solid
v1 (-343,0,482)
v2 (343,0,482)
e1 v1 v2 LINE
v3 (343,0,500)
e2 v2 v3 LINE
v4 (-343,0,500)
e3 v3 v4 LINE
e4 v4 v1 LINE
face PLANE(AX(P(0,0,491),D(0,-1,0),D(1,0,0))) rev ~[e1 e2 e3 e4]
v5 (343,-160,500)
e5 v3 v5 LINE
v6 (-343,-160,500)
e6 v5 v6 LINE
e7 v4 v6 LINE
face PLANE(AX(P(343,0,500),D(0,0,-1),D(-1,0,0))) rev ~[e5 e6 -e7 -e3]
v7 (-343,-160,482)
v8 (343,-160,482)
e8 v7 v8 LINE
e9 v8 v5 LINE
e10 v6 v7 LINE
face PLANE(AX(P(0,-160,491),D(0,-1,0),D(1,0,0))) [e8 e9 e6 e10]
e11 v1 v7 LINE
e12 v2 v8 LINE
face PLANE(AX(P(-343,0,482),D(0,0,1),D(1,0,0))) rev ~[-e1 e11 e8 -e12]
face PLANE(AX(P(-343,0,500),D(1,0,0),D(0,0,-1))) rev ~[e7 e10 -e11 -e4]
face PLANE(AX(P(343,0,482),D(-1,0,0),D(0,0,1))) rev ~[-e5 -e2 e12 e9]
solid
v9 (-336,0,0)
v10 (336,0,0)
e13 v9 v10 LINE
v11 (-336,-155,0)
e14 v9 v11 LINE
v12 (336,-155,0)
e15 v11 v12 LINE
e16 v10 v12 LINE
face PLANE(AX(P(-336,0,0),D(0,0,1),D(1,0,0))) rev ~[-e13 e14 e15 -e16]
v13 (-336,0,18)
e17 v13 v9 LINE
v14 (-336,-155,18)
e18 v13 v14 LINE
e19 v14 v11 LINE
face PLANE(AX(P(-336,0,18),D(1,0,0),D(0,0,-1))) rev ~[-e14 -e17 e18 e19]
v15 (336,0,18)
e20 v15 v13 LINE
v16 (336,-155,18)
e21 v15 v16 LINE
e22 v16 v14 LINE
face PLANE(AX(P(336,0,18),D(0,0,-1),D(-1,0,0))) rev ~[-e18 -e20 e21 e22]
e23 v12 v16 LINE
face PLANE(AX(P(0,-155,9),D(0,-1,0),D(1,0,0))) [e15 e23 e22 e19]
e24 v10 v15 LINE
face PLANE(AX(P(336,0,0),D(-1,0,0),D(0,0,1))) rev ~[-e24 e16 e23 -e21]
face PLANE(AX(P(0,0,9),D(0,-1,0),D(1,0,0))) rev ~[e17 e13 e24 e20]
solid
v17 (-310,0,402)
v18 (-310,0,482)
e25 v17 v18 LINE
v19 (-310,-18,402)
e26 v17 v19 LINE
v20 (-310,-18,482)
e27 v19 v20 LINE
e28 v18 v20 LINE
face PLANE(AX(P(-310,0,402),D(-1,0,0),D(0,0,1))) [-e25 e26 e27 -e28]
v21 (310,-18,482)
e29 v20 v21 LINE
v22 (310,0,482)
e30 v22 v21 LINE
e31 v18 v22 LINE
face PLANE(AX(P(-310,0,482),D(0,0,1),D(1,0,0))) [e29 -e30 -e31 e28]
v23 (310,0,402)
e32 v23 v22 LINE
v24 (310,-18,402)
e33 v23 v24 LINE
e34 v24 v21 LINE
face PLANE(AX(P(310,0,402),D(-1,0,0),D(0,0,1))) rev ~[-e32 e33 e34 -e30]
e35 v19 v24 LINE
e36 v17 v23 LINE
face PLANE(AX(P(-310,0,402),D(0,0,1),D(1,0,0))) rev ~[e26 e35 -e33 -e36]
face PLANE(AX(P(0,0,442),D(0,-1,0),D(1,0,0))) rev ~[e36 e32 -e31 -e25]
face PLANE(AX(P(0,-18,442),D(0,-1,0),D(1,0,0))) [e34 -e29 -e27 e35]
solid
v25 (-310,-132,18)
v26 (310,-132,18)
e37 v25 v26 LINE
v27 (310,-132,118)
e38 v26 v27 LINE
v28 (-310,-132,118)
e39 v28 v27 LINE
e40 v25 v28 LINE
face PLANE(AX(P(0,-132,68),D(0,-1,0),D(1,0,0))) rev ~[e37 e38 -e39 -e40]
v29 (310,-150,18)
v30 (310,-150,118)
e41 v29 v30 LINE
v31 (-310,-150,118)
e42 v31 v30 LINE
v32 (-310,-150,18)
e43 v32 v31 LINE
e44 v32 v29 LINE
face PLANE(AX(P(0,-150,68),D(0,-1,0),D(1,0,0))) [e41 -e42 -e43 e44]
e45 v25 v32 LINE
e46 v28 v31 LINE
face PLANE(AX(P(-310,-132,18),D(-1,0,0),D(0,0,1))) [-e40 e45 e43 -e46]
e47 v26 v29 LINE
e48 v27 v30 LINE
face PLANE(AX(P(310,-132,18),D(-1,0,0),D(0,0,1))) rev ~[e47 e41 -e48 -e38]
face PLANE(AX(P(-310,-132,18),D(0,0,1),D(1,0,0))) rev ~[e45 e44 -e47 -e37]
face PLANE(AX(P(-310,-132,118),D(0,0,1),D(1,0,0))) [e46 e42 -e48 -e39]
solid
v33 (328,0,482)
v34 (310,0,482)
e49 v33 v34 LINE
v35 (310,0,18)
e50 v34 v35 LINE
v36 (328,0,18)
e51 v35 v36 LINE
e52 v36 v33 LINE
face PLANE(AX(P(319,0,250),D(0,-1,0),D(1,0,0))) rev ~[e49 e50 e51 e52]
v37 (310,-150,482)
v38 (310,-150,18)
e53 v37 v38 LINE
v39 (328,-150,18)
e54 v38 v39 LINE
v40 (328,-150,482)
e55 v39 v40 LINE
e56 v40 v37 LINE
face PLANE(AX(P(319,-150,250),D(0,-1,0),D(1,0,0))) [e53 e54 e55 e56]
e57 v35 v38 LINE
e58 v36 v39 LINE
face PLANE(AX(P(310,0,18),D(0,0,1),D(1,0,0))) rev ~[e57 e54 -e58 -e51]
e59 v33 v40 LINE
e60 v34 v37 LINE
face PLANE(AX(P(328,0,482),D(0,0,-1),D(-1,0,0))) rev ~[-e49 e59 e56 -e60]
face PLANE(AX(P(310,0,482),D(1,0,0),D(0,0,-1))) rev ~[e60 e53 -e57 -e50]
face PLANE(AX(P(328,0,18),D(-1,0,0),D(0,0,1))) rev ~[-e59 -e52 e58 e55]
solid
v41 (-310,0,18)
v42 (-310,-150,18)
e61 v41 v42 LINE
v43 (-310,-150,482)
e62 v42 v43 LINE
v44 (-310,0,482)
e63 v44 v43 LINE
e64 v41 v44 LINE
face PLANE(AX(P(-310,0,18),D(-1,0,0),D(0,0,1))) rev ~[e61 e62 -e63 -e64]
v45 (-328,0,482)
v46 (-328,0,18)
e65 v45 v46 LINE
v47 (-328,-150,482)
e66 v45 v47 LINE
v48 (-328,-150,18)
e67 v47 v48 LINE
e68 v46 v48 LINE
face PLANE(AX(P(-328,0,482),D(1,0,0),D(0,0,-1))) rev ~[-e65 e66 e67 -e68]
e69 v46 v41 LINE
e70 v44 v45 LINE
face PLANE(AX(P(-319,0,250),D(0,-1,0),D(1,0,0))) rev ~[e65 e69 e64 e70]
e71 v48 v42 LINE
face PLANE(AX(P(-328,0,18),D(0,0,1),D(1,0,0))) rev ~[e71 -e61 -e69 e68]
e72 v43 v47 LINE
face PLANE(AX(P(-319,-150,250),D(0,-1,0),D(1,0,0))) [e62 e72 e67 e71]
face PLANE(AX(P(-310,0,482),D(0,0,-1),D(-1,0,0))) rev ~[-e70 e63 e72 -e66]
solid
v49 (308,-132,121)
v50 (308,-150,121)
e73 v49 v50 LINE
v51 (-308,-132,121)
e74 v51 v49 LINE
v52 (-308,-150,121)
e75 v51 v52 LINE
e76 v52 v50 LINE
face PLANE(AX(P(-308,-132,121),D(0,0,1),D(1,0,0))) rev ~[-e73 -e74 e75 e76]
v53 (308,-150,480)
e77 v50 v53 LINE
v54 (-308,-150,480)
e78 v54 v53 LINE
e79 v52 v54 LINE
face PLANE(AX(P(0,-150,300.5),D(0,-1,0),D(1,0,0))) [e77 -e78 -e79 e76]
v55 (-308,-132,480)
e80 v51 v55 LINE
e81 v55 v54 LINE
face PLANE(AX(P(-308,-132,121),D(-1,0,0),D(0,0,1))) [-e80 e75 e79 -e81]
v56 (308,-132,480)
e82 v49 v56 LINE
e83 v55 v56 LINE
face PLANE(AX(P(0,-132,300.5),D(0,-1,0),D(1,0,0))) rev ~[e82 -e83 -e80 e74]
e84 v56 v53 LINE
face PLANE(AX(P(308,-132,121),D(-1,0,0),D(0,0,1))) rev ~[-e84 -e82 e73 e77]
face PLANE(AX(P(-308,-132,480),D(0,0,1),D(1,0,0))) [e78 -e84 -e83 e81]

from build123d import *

# Parameters (mm, degrees)
F2_DEPTH = 150
F3_DEPTH = 155
F4_START = 132
F1_W     = 620
F1_H     = 100
F4_DEPTH = 18
F5_DEPTH = 160
F6_START = 132
F1_W_2   = 616
F1_H_2   = 359
F6_DEPTH = 18
F7_W     = 620
F7_H     = 80
F8_DEPTH = 18


# Not quite as in the source:
# - a feature of the source that left no trace in its solid (it failed there, or was rolled back) is left out


with BuildPart() as f2:
    # F1 (on Front) → F2 (new body)
    with BuildSketch(Plane.XZ):
        Polygon((-310, 118), (-310, 482), (-328, 482), (-328, 18), (-310, 18), align=None)
    extrude(amount=F2_DEPTH)


with BuildPart() as f2b:
    # F1 (on Front) → F2, piece 2 (new body)
    with BuildSketch(Plane.XZ):
        Polygon((328, 482), (310, 482), (310, 118), (310, 18), (328, 18), align=None)
    extrude(amount=F2_DEPTH)


with BuildPart() as f3:
    # F1 (on Front) → F3 (new body, through all)
    with BuildSketch(Plane.XZ):
        Polygon((310, 18), (-310, 18), (-328, 18), (-336, 18), (-336, 0), (-328, 0), (328, 0), (336, 0), (336, 18), (328, 18), align=None)
    extrude(amount=F3_DEPTH)


with BuildPart() as f4:
    # F1 (on Front) → F4 (new body)
    with BuildSketch(Plane.XZ.offset(F4_START)):
        with Locations((0, 68)):
            Rectangle(F1_W, F1_H)
    extrude(amount=F4_DEPTH)


with BuildPart() as f5:
    # F1 (on Front) → F5 (new body, through all)
    with BuildSketch(Plane.XZ):
        Polygon((-328, 482), (-310, 482), (310, 482), (328, 482), (343, 482), (343, 500), (328, 500), (-328, 500), (-343, 500), (-343, 482), align=None)
    extrude(amount=F5_DEPTH)


with BuildPart() as f6:
    # F1 (on Front) → F6 (new body)
    with BuildSketch(Plane.XZ.offset(F6_START)):
        with Locations((0, 300.5)):
            Rectangle(F1_W_2, F1_H_2)
    extrude(amount=F6_DEPTH)


with BuildPart() as f8:
    # F7 (on face) → F8 (new body)
    with BuildSketch(Plane.XZ):
        with Locations((0, 442)):
            Rectangle(F7_W, F7_H)
    extrude(amount=F8_DEPTH)


solid = Compound([f2.part, f2b.part, f3.part, f4.part, f5.part, f6.part, f8.part])
